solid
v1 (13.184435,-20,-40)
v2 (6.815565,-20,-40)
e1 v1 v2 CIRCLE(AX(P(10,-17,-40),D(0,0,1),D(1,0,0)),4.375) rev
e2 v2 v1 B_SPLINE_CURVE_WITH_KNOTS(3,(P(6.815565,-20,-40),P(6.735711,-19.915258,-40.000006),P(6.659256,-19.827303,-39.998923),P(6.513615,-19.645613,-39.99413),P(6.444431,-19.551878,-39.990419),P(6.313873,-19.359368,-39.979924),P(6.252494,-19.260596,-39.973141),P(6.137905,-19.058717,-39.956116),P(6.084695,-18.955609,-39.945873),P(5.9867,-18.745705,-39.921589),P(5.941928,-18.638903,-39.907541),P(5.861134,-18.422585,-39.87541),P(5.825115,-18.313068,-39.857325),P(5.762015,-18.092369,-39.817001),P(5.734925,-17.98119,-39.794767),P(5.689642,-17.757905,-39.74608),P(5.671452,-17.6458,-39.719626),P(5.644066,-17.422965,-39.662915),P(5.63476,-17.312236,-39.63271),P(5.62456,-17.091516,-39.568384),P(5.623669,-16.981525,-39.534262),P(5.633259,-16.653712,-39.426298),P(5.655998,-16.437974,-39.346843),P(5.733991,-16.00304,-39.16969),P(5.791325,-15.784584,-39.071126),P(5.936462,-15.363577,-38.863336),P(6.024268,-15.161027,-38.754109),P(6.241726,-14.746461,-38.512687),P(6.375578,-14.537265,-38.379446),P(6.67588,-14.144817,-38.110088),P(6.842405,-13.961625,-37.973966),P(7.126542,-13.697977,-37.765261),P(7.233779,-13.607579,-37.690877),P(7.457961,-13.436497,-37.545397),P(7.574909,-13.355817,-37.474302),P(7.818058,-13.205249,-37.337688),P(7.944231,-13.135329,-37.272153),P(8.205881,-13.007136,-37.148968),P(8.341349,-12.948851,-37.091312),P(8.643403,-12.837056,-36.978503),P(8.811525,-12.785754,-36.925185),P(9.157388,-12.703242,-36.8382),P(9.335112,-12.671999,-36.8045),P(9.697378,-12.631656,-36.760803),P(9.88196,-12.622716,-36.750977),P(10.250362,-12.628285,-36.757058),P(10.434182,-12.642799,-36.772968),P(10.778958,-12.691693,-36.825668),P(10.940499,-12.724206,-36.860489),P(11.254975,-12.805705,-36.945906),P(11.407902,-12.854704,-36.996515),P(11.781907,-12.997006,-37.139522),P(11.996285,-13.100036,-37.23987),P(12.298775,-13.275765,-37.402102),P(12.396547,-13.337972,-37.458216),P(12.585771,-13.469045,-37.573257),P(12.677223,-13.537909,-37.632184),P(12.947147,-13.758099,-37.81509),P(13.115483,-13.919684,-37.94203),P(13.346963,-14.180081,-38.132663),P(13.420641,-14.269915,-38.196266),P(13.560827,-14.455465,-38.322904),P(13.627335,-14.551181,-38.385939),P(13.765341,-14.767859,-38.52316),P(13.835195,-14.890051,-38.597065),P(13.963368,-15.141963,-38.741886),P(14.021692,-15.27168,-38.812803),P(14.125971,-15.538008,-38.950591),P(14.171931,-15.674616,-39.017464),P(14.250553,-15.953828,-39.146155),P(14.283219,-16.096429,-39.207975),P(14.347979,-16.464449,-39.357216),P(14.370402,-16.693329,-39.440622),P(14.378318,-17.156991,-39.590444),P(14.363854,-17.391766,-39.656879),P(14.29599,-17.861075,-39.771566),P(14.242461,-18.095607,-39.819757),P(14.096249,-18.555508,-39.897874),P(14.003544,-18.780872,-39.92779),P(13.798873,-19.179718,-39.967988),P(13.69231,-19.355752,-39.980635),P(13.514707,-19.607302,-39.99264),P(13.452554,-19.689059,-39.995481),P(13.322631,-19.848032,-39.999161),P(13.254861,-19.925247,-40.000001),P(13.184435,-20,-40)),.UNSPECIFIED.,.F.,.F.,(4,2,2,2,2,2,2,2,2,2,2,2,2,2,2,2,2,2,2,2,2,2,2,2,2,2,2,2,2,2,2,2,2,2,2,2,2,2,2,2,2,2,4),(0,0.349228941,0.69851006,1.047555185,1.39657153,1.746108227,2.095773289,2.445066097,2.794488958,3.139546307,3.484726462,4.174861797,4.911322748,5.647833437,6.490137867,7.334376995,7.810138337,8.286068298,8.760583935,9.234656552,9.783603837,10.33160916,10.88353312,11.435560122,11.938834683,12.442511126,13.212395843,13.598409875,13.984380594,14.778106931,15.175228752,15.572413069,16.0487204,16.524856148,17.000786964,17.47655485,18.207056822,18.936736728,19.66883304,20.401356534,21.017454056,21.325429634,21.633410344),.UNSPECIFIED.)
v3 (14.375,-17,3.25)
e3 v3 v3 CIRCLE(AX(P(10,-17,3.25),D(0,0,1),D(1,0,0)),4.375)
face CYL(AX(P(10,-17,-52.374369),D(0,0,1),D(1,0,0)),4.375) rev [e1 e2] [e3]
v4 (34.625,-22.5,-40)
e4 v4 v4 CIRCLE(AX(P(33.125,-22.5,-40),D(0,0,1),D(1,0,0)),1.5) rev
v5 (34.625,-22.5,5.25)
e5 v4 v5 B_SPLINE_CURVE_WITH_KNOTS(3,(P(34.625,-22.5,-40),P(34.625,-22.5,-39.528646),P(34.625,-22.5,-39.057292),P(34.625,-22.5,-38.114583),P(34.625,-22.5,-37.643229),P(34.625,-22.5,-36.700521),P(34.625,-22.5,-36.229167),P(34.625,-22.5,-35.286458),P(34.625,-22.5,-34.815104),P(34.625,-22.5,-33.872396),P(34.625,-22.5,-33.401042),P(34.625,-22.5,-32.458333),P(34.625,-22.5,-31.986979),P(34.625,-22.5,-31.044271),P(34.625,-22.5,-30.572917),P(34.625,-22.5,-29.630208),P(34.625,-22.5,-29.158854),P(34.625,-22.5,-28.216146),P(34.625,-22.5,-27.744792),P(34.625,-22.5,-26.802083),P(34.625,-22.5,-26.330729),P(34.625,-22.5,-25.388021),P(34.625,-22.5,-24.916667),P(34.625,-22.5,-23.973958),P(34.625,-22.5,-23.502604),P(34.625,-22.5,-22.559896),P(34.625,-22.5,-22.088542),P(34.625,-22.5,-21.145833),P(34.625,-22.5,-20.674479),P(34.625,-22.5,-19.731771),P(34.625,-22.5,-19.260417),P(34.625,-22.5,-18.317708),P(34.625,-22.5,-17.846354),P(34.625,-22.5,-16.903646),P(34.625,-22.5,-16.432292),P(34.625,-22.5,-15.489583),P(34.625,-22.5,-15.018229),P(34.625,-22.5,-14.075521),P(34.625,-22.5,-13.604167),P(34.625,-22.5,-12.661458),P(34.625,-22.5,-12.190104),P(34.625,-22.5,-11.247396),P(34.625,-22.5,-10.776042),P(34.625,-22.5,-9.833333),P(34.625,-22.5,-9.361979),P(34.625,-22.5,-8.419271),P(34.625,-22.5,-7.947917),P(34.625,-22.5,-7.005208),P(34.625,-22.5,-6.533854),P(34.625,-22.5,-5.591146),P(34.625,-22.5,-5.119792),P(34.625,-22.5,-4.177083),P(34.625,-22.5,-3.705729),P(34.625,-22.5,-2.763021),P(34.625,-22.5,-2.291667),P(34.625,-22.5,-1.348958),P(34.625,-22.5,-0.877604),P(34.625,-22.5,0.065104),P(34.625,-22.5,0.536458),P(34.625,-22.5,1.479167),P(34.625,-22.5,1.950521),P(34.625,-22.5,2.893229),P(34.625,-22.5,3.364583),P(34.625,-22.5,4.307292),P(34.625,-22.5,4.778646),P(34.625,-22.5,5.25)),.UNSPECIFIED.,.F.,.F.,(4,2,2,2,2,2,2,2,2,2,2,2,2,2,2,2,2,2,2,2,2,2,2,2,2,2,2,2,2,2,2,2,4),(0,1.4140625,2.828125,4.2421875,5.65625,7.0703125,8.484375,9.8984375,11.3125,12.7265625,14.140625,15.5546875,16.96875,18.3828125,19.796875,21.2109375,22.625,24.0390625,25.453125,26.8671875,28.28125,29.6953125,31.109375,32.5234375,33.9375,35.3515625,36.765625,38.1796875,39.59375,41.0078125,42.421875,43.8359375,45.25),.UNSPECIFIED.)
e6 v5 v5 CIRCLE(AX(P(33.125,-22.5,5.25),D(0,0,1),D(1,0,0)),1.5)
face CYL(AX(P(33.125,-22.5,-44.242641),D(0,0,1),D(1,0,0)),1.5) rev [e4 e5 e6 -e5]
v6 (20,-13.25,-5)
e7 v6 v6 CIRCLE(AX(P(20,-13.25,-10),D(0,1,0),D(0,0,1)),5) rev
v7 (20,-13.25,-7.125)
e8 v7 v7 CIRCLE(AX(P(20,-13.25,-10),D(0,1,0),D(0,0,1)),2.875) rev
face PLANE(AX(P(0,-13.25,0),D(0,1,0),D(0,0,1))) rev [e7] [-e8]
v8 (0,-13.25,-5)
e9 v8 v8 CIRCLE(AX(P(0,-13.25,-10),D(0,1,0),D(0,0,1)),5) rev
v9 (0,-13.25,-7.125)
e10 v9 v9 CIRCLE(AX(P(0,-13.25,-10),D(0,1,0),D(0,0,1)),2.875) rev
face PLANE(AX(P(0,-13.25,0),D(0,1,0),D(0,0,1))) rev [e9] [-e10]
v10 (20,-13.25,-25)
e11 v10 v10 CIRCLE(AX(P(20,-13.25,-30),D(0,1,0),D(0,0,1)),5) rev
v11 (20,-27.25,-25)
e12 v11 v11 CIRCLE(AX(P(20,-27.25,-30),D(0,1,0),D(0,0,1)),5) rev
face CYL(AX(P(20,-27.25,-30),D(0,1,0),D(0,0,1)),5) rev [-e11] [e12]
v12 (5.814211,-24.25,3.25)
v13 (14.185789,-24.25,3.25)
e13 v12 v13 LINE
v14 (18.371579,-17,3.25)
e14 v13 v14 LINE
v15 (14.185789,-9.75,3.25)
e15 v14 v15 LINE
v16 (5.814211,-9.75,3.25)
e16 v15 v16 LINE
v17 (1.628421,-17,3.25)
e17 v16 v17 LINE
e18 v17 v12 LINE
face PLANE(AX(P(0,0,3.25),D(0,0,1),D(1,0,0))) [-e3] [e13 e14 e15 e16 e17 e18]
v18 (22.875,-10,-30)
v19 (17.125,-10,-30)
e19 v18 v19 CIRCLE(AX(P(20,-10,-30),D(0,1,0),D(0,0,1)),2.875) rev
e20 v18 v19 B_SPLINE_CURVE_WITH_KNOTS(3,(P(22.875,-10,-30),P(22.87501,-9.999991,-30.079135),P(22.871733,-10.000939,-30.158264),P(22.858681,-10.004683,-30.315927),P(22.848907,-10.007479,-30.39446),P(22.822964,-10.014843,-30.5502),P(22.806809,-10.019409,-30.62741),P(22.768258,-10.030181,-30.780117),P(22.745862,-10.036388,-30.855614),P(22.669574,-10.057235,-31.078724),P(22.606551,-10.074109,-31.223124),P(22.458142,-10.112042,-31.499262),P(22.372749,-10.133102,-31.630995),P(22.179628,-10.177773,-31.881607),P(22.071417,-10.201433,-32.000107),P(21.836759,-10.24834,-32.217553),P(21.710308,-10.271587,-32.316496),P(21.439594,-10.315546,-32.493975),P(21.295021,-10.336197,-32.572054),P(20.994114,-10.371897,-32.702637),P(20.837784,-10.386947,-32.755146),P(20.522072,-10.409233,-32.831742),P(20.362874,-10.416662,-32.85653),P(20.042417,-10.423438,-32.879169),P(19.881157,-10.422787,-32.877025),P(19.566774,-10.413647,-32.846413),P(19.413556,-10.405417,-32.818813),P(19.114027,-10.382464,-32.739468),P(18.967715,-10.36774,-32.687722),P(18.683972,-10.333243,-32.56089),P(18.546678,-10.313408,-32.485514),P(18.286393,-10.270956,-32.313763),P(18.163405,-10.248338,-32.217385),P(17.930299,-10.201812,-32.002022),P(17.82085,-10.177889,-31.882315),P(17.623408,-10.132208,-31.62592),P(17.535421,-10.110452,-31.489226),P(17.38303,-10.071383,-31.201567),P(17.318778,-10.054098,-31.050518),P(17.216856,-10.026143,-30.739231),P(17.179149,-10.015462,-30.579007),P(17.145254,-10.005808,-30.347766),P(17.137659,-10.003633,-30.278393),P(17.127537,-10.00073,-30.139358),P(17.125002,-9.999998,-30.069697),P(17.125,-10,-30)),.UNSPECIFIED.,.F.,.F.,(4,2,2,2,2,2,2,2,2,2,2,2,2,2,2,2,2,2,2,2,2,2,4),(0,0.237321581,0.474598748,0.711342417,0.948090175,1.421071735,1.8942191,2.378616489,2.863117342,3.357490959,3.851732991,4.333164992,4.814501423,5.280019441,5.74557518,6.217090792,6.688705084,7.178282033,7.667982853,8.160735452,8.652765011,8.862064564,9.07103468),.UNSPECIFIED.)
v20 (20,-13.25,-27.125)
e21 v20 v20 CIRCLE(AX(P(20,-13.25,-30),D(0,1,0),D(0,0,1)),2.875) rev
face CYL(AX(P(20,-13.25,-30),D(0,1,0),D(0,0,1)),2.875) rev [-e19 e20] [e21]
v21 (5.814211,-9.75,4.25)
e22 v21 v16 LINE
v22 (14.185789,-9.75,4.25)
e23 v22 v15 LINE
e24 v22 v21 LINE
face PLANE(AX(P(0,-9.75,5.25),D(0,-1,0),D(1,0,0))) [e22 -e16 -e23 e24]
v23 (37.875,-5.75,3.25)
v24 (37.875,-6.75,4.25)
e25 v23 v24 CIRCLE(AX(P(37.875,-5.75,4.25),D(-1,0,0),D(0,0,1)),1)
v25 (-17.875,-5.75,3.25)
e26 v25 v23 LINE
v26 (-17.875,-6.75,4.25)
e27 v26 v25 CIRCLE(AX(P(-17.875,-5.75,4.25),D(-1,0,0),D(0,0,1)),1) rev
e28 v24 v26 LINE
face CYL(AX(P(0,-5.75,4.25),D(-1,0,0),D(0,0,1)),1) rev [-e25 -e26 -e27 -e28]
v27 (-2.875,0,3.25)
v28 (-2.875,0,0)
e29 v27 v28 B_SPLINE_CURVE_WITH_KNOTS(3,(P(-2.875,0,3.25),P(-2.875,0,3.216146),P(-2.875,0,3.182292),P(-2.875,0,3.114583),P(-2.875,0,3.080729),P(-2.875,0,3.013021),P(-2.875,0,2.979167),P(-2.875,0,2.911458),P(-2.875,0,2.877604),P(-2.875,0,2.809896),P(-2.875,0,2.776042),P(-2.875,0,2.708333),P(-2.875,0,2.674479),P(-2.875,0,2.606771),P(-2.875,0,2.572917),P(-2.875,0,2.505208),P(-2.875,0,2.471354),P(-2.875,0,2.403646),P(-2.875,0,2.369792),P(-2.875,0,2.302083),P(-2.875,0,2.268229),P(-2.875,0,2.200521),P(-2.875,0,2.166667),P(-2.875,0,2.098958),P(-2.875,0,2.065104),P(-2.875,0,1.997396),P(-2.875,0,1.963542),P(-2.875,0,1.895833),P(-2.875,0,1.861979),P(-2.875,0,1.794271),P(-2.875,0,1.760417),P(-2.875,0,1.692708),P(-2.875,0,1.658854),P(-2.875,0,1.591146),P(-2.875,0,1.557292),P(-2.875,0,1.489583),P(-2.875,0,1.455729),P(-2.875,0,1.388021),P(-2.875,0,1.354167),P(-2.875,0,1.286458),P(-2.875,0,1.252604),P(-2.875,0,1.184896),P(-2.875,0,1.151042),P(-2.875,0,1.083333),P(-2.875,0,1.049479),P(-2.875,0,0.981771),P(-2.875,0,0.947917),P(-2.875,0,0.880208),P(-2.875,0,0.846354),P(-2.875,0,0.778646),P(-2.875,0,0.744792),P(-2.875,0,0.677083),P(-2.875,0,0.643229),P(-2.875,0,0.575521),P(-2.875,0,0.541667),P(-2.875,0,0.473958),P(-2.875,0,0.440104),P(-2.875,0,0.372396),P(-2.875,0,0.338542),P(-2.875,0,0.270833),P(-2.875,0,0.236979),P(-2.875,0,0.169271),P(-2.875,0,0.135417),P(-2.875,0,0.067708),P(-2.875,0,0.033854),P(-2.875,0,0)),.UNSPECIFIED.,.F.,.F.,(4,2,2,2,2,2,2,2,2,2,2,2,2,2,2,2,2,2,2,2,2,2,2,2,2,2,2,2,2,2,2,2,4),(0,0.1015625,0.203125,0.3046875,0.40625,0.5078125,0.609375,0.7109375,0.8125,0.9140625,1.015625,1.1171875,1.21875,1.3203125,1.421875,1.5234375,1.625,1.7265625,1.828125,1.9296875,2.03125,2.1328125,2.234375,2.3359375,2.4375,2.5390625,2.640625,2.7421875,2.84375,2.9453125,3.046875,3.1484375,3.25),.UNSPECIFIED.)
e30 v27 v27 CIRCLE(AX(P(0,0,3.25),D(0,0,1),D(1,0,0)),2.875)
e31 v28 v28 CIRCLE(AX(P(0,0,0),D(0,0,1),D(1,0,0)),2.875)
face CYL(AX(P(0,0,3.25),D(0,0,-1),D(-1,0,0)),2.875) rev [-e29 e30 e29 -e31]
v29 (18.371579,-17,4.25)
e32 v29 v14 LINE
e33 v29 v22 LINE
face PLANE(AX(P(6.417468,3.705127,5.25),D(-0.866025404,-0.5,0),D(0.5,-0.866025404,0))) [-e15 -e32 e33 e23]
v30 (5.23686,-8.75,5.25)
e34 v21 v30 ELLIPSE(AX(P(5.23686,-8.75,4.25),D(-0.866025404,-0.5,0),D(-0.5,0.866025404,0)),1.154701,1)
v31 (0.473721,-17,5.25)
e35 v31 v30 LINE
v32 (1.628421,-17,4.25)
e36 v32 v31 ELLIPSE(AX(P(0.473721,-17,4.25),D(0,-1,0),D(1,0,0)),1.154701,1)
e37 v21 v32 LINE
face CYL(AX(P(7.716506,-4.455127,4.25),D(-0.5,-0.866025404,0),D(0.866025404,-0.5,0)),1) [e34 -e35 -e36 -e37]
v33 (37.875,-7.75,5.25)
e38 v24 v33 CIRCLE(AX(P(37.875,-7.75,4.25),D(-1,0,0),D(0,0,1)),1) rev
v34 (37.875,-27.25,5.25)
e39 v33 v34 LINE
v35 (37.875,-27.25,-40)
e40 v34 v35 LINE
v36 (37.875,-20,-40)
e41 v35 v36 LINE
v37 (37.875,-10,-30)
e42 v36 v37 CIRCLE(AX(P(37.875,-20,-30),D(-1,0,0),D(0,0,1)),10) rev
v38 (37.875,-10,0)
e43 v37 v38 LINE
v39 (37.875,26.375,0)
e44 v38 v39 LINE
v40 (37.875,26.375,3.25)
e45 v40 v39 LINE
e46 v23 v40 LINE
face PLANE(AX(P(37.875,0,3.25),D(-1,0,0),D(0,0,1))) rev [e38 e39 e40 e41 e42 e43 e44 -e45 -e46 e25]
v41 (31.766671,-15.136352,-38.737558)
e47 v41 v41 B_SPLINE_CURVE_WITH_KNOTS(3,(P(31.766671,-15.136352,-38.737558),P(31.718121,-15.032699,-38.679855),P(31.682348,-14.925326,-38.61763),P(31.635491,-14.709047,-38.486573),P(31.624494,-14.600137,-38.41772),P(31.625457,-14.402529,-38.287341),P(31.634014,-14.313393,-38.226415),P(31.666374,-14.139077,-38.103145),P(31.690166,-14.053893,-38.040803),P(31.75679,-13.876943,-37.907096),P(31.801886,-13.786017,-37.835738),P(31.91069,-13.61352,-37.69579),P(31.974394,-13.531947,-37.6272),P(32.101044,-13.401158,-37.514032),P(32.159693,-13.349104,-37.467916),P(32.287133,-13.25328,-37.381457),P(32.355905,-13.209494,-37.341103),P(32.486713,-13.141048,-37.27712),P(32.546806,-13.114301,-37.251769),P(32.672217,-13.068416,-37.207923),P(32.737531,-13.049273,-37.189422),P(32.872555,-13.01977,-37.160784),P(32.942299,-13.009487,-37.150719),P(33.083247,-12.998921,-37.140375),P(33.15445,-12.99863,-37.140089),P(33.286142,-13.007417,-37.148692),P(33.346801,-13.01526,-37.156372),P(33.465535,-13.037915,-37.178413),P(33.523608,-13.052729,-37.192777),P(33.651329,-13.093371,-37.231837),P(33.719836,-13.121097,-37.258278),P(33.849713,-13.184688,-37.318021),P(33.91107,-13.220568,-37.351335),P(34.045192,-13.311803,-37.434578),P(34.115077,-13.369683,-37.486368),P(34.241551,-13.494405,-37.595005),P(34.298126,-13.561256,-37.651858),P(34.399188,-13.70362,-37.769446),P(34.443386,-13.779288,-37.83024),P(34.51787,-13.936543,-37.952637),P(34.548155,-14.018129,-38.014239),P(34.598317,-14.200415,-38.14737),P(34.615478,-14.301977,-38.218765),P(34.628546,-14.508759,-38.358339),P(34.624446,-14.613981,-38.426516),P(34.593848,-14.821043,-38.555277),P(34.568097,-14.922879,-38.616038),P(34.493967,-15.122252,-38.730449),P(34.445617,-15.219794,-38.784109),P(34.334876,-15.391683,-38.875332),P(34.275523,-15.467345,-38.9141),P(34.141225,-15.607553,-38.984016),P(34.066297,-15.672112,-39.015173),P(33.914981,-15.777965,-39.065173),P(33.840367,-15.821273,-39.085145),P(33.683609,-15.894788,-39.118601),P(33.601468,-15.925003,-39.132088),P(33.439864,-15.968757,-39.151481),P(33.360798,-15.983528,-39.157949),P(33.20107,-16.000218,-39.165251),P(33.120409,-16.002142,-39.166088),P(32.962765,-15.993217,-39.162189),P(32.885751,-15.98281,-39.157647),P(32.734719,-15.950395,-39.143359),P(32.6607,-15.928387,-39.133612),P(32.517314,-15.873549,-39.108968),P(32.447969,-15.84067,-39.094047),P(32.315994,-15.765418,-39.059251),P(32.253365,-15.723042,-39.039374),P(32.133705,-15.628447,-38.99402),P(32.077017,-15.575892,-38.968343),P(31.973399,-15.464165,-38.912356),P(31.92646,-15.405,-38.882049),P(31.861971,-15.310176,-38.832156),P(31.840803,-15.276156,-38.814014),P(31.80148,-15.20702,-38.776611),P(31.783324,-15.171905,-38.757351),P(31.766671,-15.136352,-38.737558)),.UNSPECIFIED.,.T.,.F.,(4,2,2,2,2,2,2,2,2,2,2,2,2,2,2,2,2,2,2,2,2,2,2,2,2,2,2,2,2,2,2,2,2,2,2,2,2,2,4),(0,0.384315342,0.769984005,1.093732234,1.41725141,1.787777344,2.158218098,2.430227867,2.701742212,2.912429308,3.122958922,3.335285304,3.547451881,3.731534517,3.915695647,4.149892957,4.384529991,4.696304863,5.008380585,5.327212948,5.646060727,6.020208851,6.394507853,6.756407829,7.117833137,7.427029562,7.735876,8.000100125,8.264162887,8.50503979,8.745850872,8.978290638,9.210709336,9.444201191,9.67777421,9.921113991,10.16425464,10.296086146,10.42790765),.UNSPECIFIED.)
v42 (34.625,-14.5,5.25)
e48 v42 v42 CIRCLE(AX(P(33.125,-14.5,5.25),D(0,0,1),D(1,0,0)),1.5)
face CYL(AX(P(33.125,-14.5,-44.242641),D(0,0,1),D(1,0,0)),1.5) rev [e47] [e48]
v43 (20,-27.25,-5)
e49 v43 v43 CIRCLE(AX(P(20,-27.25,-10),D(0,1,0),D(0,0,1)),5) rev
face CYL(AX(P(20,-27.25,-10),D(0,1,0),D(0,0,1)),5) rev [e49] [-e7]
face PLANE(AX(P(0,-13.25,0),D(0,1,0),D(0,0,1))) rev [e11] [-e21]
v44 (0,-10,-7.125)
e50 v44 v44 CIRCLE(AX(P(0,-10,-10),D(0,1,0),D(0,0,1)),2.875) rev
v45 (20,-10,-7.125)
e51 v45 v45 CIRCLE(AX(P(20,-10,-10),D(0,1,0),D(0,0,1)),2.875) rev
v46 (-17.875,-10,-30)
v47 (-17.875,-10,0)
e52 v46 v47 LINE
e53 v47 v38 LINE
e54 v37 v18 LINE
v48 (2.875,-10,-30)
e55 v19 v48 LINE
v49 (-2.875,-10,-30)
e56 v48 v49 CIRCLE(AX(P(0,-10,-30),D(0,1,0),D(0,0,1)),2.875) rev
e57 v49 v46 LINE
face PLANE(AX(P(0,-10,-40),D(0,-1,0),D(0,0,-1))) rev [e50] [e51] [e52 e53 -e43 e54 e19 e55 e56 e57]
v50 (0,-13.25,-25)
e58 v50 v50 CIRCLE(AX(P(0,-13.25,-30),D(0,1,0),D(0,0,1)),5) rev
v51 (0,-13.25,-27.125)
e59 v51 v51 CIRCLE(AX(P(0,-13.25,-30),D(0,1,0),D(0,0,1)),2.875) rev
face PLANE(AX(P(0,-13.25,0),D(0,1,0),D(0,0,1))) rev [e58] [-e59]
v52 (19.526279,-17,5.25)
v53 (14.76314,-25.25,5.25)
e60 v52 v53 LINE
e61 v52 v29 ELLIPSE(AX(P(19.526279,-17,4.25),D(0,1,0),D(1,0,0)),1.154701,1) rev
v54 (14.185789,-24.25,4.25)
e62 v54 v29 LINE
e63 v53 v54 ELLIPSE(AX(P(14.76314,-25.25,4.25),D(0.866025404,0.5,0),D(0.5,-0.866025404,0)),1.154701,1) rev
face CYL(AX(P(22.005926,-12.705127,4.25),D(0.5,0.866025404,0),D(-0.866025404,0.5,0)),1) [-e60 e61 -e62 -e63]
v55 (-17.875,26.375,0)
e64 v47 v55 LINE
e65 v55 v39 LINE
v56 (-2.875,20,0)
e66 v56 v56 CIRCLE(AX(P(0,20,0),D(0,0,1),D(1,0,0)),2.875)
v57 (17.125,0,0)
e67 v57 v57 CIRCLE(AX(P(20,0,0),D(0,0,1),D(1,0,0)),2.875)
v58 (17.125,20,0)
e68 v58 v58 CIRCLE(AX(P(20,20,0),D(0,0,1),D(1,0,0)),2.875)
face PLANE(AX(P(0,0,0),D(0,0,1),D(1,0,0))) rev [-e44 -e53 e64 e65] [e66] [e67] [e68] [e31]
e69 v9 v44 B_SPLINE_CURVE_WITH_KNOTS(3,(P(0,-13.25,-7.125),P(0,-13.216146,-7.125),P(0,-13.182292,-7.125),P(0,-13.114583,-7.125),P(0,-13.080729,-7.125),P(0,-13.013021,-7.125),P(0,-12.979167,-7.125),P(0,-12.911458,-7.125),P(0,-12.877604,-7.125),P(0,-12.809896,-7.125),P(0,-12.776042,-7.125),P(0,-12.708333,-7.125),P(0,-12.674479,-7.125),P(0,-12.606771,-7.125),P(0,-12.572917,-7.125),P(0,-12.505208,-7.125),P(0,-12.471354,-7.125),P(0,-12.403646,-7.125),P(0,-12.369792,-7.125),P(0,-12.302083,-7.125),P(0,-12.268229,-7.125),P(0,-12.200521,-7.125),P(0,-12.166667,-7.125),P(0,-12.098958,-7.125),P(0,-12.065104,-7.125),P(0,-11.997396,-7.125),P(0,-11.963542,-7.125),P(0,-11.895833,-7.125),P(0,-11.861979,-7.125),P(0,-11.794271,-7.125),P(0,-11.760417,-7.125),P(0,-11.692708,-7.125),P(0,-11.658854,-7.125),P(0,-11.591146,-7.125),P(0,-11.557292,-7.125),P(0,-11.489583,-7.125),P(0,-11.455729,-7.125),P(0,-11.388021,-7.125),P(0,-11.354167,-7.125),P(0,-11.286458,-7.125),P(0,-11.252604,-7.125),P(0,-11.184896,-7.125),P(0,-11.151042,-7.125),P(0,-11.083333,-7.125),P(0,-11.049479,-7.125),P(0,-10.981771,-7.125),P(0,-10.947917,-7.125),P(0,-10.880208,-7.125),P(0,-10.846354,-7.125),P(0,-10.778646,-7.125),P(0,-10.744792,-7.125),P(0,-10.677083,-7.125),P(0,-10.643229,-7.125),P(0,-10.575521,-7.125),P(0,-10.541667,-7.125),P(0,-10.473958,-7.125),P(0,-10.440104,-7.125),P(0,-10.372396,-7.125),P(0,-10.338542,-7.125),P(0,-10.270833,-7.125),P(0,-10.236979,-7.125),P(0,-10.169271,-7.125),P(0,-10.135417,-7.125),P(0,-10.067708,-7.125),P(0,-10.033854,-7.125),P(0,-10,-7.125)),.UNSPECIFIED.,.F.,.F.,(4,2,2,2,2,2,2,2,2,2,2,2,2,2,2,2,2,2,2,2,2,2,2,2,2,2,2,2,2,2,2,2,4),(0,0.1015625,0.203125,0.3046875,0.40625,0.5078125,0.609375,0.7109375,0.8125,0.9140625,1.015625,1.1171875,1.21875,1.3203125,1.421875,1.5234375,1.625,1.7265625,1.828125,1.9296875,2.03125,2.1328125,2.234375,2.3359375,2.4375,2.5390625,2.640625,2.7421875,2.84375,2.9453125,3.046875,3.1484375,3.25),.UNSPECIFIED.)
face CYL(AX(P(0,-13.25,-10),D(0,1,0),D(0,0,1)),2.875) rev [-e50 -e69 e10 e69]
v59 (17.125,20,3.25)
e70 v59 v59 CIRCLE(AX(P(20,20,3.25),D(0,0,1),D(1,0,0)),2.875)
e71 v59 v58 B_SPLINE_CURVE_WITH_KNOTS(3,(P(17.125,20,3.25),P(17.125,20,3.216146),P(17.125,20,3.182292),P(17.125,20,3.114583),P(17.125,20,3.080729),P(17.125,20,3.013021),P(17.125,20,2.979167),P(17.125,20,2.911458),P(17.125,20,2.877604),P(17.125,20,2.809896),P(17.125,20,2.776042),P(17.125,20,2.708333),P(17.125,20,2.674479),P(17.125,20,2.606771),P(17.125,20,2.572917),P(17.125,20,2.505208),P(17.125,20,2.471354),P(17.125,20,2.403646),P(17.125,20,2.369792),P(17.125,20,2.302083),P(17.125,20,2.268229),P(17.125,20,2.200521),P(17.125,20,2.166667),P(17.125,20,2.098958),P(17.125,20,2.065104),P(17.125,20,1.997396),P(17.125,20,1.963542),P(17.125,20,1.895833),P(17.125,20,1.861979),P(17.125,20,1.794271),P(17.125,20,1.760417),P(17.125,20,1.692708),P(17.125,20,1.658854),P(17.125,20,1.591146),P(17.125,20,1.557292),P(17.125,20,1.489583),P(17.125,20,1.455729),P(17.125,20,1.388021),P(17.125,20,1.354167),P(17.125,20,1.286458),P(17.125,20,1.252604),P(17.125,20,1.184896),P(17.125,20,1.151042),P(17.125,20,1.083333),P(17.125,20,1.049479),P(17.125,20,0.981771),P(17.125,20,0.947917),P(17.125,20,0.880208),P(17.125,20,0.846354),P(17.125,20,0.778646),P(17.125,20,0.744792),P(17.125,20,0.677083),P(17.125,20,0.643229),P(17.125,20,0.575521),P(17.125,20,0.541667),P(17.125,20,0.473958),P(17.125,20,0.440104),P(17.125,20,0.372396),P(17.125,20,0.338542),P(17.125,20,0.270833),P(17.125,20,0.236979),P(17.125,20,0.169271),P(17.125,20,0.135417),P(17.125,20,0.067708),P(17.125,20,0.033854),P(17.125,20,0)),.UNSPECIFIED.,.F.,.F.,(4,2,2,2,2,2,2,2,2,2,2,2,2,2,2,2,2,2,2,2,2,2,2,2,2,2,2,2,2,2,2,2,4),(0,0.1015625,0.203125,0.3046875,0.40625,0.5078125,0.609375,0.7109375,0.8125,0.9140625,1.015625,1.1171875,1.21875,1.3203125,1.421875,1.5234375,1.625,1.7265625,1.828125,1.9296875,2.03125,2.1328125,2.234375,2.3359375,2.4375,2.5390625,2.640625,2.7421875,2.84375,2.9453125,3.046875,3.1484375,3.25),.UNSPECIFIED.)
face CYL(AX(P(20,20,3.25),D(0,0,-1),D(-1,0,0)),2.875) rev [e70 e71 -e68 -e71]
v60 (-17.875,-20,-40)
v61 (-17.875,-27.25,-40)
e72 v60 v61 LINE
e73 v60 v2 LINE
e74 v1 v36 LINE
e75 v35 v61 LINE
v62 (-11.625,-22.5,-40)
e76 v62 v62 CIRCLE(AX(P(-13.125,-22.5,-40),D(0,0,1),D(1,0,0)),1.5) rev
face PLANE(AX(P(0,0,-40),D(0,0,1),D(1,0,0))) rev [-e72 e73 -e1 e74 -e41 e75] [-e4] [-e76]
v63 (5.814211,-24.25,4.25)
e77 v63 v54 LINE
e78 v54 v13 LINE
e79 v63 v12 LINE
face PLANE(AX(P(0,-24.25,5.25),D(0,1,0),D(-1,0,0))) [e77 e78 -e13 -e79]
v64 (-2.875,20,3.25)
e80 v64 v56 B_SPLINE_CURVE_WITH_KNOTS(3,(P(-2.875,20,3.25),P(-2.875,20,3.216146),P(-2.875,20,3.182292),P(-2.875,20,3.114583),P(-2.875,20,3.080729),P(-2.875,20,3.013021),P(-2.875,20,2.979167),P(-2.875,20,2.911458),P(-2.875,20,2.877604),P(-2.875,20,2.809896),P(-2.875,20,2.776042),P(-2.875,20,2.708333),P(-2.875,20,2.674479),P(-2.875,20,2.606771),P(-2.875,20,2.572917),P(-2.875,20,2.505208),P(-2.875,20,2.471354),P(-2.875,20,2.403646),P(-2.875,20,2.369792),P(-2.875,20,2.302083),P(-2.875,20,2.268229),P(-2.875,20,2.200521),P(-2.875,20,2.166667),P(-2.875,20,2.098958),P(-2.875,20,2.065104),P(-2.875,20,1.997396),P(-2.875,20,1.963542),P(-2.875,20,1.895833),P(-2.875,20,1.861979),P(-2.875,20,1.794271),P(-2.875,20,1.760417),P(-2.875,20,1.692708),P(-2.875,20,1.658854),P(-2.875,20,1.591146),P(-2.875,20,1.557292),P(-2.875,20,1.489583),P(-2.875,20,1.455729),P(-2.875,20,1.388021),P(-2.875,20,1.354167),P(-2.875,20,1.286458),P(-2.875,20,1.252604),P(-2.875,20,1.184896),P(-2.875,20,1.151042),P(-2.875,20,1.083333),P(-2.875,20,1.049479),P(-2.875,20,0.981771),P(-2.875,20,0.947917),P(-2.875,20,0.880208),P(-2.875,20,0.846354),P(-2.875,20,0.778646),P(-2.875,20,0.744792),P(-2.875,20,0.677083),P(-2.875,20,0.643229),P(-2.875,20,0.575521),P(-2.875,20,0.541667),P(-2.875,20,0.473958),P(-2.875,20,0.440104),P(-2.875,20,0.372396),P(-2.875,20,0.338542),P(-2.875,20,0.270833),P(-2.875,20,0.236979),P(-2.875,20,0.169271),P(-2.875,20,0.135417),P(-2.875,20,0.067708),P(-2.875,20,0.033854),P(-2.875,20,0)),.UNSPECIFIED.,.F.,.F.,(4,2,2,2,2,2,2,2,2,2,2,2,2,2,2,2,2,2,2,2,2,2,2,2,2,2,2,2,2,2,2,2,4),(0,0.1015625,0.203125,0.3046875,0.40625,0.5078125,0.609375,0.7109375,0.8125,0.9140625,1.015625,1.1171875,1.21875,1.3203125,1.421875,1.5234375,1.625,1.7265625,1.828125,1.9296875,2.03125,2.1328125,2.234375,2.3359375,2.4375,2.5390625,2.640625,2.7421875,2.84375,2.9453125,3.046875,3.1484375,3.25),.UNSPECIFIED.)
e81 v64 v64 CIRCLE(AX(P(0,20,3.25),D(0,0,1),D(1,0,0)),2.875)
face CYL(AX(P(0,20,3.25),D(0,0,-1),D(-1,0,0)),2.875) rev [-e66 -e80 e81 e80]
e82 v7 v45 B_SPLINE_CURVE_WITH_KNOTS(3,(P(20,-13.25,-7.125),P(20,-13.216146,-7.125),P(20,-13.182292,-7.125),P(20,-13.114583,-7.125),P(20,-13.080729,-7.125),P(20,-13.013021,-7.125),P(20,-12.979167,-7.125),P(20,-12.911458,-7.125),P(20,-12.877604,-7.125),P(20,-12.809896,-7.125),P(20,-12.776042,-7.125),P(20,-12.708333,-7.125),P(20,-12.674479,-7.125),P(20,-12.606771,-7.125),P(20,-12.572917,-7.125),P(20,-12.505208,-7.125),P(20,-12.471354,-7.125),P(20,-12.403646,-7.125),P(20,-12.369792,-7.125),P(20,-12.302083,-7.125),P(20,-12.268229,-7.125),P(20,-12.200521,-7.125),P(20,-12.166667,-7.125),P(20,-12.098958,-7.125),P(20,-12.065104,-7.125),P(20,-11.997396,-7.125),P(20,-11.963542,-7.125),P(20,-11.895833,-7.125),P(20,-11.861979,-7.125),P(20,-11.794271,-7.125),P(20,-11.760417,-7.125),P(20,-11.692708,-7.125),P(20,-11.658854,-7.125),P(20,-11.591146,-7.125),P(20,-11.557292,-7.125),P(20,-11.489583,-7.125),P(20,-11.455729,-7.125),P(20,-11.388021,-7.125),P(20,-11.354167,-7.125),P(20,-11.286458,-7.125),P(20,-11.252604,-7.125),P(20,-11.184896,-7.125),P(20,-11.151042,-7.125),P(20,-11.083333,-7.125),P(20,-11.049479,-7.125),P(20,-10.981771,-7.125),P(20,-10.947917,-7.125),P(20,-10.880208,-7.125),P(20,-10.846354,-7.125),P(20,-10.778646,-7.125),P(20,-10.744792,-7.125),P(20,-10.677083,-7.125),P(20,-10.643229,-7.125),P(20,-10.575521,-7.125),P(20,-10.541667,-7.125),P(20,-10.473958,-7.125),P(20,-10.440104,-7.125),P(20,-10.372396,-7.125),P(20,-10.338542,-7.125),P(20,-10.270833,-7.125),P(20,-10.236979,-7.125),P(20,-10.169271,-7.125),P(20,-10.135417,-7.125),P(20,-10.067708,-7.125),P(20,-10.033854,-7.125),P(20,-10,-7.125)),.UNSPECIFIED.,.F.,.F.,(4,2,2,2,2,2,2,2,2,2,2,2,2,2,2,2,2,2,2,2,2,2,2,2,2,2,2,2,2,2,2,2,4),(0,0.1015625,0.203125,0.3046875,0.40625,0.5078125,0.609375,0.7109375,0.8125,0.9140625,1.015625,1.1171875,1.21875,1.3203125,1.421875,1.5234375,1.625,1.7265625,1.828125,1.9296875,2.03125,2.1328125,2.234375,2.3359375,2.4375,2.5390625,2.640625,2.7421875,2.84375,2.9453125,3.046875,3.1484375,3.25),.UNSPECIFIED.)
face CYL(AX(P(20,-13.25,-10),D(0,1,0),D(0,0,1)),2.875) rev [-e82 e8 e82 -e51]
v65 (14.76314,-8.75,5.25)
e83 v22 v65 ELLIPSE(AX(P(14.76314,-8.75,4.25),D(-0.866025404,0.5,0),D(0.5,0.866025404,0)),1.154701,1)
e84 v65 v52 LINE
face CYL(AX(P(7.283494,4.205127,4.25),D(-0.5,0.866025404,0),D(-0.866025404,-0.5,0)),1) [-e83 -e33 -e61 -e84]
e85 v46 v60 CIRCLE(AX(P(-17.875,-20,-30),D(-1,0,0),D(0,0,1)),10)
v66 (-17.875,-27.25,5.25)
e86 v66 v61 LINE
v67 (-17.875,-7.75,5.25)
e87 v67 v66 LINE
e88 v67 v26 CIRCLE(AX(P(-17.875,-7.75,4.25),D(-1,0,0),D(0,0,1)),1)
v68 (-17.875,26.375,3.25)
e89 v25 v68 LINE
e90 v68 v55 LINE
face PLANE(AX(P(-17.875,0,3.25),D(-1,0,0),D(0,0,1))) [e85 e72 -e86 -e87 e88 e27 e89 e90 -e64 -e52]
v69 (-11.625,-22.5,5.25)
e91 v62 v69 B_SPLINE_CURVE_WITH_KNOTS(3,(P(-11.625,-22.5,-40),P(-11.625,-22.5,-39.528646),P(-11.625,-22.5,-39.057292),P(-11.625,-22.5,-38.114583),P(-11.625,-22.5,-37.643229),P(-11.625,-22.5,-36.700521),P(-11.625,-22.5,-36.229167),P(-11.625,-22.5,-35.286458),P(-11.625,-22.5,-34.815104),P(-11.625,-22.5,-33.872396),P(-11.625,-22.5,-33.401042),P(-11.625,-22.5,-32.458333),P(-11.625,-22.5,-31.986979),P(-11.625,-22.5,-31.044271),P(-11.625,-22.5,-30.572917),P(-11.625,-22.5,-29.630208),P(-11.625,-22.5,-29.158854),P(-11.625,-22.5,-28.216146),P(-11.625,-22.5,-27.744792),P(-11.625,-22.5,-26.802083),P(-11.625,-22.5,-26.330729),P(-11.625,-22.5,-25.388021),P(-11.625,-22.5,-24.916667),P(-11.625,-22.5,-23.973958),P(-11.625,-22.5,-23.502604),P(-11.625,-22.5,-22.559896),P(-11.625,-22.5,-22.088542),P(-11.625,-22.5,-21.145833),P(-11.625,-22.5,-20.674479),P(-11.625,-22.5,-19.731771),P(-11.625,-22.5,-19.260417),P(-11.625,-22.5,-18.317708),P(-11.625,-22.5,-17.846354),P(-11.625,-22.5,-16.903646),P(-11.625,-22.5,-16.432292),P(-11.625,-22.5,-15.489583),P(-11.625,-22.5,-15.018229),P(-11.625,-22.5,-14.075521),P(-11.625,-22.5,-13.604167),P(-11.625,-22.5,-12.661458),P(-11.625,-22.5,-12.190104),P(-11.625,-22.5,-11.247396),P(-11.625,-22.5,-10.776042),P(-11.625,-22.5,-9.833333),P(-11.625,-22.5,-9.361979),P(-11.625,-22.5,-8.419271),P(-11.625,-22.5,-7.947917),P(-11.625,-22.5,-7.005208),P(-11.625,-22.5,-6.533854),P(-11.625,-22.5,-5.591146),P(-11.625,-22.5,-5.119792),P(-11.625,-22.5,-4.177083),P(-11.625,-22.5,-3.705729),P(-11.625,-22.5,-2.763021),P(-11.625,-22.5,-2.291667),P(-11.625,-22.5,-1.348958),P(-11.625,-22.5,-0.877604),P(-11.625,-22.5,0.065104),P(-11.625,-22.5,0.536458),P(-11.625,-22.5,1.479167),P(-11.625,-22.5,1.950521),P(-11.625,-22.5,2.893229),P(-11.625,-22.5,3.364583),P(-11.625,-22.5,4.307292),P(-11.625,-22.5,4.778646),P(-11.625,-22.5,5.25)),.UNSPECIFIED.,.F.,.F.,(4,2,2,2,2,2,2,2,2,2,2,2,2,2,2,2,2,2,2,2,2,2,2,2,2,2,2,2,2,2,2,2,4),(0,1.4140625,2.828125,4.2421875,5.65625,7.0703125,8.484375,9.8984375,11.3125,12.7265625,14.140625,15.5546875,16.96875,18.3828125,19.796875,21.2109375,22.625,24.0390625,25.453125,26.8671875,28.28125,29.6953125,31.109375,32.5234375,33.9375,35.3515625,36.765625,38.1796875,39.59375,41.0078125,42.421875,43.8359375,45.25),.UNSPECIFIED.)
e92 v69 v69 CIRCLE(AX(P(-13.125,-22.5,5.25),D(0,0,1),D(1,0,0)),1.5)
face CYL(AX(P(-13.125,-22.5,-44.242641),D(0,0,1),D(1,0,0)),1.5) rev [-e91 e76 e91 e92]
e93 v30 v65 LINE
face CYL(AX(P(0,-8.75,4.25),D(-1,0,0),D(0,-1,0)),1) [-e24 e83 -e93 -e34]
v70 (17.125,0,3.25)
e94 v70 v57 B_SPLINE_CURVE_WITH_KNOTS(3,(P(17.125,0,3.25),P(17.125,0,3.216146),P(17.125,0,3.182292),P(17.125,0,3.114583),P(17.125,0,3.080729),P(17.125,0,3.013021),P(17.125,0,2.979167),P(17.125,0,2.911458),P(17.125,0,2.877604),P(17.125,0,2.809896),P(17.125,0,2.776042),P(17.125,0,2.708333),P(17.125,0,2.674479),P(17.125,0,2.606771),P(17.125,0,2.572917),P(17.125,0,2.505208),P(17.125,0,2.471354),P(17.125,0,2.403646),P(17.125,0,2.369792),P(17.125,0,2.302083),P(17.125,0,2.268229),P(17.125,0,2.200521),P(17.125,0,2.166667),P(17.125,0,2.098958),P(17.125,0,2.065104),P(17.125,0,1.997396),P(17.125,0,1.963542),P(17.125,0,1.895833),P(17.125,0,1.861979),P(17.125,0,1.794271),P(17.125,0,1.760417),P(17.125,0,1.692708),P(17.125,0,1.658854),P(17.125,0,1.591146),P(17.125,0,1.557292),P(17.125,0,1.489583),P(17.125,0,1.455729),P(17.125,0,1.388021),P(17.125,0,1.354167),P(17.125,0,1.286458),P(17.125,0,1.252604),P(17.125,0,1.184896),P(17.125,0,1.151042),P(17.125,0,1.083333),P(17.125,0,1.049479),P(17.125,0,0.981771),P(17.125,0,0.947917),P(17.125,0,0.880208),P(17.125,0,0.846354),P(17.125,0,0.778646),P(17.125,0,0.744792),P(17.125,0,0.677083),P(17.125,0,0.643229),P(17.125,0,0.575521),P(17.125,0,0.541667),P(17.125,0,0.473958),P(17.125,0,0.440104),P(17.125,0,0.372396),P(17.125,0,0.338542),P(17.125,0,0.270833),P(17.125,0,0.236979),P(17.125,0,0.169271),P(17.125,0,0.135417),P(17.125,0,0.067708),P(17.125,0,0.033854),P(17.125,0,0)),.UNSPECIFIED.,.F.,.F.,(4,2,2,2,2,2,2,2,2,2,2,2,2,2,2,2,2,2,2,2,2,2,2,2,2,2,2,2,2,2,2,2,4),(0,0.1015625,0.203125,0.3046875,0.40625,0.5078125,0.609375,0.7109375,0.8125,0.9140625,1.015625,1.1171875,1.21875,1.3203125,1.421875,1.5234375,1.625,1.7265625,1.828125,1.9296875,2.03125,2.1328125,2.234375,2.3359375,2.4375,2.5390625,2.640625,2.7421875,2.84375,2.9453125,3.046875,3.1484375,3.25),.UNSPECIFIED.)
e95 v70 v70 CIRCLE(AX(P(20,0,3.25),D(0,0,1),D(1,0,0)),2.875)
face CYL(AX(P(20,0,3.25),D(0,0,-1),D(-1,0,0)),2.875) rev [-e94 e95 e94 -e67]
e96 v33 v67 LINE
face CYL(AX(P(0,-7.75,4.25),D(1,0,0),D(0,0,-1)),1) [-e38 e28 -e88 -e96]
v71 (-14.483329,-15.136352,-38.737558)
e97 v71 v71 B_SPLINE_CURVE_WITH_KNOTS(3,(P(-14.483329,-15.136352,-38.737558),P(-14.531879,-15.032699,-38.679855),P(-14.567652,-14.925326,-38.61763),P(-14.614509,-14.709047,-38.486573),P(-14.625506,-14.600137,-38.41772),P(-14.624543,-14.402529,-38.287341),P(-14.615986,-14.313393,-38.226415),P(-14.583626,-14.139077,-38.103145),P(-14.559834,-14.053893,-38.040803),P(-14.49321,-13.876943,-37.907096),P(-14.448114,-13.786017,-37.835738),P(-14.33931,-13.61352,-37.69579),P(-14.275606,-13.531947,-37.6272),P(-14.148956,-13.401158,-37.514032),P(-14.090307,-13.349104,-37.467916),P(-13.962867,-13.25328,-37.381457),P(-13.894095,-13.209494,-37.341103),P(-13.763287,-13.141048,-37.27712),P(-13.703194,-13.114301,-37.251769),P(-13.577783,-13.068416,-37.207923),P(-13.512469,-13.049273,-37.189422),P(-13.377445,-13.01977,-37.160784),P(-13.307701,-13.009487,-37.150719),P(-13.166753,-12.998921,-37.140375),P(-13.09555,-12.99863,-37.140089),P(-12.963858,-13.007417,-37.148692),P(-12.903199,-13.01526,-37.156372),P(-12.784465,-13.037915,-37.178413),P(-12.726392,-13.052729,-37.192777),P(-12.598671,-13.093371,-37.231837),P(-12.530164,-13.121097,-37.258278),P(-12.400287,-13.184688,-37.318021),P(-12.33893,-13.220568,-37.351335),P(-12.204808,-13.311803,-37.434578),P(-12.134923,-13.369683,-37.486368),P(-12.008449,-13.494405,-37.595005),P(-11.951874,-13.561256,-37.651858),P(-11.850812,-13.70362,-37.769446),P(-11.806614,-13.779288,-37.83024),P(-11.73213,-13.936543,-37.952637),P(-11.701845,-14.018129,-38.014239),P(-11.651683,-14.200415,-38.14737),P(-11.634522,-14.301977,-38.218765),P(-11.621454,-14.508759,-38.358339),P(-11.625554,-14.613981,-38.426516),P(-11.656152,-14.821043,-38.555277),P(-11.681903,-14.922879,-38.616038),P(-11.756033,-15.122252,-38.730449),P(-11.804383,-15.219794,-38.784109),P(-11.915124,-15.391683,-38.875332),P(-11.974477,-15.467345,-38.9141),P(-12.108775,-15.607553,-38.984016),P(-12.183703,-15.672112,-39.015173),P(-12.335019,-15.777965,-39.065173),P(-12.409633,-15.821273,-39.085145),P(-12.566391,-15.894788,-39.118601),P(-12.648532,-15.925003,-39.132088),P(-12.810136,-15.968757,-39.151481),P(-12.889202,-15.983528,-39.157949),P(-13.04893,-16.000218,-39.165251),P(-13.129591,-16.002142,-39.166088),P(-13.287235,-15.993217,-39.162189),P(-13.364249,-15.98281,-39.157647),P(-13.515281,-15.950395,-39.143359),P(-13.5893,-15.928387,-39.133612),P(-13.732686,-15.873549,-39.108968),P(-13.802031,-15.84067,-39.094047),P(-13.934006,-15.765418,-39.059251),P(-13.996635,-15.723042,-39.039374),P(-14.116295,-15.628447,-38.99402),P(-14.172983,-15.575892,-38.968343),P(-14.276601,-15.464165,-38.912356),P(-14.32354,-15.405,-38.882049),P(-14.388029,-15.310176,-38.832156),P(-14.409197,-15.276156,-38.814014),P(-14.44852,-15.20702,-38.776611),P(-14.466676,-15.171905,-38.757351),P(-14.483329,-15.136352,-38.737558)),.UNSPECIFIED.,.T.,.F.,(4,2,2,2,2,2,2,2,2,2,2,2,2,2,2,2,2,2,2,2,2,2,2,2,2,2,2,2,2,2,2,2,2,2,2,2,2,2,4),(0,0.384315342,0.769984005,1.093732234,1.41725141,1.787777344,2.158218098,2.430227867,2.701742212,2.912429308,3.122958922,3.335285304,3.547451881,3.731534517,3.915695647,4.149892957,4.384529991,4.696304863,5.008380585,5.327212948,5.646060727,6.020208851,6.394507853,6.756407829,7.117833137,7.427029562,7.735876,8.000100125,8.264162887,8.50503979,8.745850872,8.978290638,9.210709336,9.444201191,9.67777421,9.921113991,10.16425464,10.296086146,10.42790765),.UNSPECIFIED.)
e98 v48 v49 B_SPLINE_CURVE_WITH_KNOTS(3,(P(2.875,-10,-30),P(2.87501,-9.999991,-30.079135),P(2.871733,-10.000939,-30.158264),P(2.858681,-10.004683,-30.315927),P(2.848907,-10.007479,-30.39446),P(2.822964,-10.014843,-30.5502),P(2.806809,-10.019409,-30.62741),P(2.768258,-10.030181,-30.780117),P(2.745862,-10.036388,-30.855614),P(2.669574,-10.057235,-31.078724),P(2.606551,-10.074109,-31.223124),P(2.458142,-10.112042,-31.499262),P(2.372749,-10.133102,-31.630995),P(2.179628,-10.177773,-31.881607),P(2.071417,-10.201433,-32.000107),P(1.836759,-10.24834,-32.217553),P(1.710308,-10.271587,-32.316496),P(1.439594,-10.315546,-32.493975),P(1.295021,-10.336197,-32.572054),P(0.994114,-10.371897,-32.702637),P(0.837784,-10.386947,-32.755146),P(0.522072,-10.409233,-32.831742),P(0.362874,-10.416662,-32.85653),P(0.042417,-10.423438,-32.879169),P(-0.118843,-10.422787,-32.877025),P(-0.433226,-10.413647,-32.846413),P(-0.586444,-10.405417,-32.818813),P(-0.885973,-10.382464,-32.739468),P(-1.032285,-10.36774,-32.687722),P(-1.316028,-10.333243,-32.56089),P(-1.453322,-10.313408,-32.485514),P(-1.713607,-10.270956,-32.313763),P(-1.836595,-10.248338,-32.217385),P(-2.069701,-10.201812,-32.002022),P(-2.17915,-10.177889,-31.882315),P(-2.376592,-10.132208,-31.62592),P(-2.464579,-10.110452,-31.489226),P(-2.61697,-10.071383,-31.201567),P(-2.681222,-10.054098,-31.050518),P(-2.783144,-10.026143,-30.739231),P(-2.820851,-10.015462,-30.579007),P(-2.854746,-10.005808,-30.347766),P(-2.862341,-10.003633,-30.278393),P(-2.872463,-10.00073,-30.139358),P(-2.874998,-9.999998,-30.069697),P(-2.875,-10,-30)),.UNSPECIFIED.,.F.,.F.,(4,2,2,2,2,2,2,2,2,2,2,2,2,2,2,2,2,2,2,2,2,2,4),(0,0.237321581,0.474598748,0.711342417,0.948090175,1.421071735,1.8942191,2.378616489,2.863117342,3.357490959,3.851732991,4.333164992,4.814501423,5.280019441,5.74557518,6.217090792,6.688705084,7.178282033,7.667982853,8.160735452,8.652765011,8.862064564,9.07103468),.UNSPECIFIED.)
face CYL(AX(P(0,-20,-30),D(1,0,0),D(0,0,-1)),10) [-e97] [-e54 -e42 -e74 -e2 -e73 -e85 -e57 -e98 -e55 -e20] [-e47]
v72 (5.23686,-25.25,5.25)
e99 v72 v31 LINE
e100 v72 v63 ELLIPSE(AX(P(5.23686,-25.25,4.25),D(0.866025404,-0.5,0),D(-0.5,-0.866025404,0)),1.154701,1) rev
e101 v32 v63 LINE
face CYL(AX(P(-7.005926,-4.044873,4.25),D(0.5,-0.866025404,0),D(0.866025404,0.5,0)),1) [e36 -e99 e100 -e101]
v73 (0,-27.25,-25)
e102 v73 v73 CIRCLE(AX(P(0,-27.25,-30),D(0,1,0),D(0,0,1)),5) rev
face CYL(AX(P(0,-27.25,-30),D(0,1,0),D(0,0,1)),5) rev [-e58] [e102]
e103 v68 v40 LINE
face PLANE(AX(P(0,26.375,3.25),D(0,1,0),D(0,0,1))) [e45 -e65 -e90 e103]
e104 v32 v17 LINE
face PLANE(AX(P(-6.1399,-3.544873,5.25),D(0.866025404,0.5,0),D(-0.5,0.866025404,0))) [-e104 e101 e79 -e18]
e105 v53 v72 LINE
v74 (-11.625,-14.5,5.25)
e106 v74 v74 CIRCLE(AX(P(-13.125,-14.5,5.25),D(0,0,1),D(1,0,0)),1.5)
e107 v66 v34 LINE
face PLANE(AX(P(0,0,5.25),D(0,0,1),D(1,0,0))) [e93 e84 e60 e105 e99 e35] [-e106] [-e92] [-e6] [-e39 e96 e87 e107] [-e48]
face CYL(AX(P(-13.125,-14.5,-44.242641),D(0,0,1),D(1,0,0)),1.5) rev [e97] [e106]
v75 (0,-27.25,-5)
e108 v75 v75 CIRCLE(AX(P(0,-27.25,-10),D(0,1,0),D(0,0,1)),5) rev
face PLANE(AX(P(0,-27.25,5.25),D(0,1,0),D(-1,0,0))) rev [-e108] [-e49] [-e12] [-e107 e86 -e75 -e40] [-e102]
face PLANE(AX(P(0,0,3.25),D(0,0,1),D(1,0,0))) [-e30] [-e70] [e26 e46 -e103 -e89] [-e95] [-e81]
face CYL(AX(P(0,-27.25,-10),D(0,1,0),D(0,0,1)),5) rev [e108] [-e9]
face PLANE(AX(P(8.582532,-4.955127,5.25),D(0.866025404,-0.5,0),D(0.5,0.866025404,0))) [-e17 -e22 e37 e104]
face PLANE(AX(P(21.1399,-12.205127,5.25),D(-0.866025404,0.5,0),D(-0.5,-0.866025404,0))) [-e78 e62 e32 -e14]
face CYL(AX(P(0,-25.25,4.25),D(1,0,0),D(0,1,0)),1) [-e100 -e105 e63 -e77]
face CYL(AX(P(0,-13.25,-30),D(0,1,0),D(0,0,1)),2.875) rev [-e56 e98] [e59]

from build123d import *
from build123d.topology import SkipClean

# Parameters (mm, degrees)
SKETCH1_R           = 2.875
SKETCH1_W           = 55.75
SKETCH1_H           = 3.25
BOSS_EXTRUDE1_DEPTH = 3.25
SKETCH1_4_W         = 55.75
SKETCH1_4_H         = 3.25
BOSS_EXTRUDE2_DEPTH = 40
CUT_EXTRUDE2_DEPTH  = 43.25
BOSS_EXTRUDE4_DEPTH = 2
BOSS_EXTRUDE5_DEPTH = 43.25
SKETCH2_R           = 5
SKETCH2_R_2         = 2.875
CUT_EXTRUDE1_DEPTH  = 17.25
FILLET1_R           = 1
SKETCH2_3_R         = 5
SKETCH2_3_R_2       = 2.875
BOSS_EXTRUDE6_DEPTH = 3.25
SKETCH4_R           = 1.5
CUT_EXTRUDE4_DEPTH  = 45.25
FILLET4_R           = 1
FILLET5_R           = 10


# Some blends are built 0.0001 mm under size
with BuildPart() as part:
    # Sketch1 → Boss-Extrude1 (new body)
    # profile 1 of 2: a face of its own
    with BuildSketch(Plane.XY):
        Polygon((-17.875, -10), (37.875, -10), (37.875, -6.375), (37.875, 26.375), (-17.875, 26.375), (-17.875, -6.375), align=None)
        with Locations(Location((20, 20, 0), (0, 0, 180))):
            Circle(SKETCH1_R, mode=Mode.SUBTRACT)
        with Locations(Location((20, 0, 0), (0, 0, 180))):
            Circle(SKETCH1_R, mode=Mode.SUBTRACT)
        with Locations(Location((0, 0, 0), (0, 0, 180))):
            Circle(SKETCH1_R, mode=Mode.SUBTRACT)
        with Locations(Location((0, 20, 0), (0, 0, 180))):
            Circle(SKETCH1_R, mode=Mode.SUBTRACT)
    # profile 2 of 2: a face of its own
    with BuildSketch(Plane.XY):
        with Locations((10, -11.625)):
            Rectangle(SKETCH1_W, SKETCH1_H)
    extrude(amount=BOSS_EXTRUDE1_DEPTH)

    # Sketch1<4> → Boss-Extrude2 (add)
    with BuildSketch(Plane.XY):
        with Locations((10, -11.625)):
            Rectangle(SKETCH1_4_W, SKETCH1_4_H)
    extrude(amount=-BOSS_EXTRUDE2_DEPTH)

    # Sketch3 → Cut-Extrude2 (cut)
    with BuildSketch(Plane.XY.offset(3.25)):
        with BuildLine():
            Line((12.253469547, -13.25), (7.746530453, -13.25))
            ThreePointArc((7.746530453, -13.25), (7.84573728, -20.807857289), (14.375, -17))
            ThreePointArc((14.375, -17), (13.807857289, -14.84573728), (12.253469547, -13.25))
        make_face()
        with BuildLine():
            ThreePointArc((12.253469547, -13.25), (10, -12.625), (7.746530453, -13.25))
            Line((7.746530453, -13.25), (12.253469547, -13.25))
        make_face()
    extrude(amount=-CUT_EXTRUDE2_DEPTH, mode=Mode.SUBTRACT)

    # Sketch3<4> → Boss-Extrude4 (add)
    with BuildSketch(Plane.XY.offset(3.25)):
        Polygon((3.793484606, -13.25), (-17.875, -13.25), (-17.875, -27.25), (37.875, -27.25), (37.875, -13.25), (16.206515394, -13.25), (18.371578903, -17), (14.185789452, -24.25), (5.814210548, -24.25), (1.628421097, -17), align=None)
        Polygon((37.875, -6.75), (-17.875, -6.75), (-17.875, -13.25), (3.793484606, -13.25), (5.814210548, -9.75), (14.185789452, -9.75), (16.206515394, -13.25), (37.875, -13.25), align=None)
    extrude(amount=BOSS_EXTRUDE4_DEPTH)

    # Sketch3<5> → Boss-Extrude5 (add)
    with SkipClean():  # the faces are left unmerged after this step: merging them gives an invalid solid
        with BuildSketch(Plane.XY.offset(3.25)):
            Polygon((3.793484606, -13.25), (-17.875, -13.25), (-17.875, -27.25), (37.875, -27.25), (37.875, -13.25), (16.206515394, -13.25), (18.371578903, -17), (14.185789452, -24.25), (5.814210548, -24.25), (1.628421097, -17), align=None)
            with BuildLine():
                Line((7.746530453, -13.25), (3.793484606, -13.25))
                Line((3.793484606, -13.25), (1.628421097, -17))
                Line((1.628421097, -17), (5.814210548, -24.25))
                Line((5.814210548, -24.25), (14.185789452, -24.25))
                Line((14.185789452, -24.25), (18.371578903, -17))
                Line((18.371578903, -17), (16.206515394, -13.25))
                Line((16.206515394, -13.25), (12.253469547, -13.25))
                ThreePointArc((12.253469547, -13.25), (13.807857289, -14.84573728), (14.375, -17))
                ThreePointArc((14.375, -17), (7.84573728, -20.807857289), (7.746530453, -13.25))
            make_face()
        extrude(amount=-BOSS_EXTRUDE5_DEPTH)

    # Sketch2 → Cut-Extrude1 (cut)
    # profile 1 of 8: a face of its own
    with SkipClean():  # the faces are left unmerged after this step: merging them gives an invalid solid
        with BuildSketch(Plane.XZ.offset(10)):
            with Locations(Location((20, -10, 0), (0, 0, 90))):
                Circle(SKETCH2_R)
            with Locations((20, -10)):
                Circle(SKETCH2_R_2, mode=Mode.SUBTRACT)
        # profile 2 of 8: a face of its own
        with BuildSketch(Plane.XZ.offset(10)):
            with Locations((20, -10)):
                Circle(SKETCH2_R_2)
        # profile 3 of 8: a face of its own
        with BuildSketch(Plane.XZ.offset(10)):
            with Locations(Location((0, -10, 0), (0, 0, 90))):
                Circle(SKETCH2_R)
            with Locations((0, -10)):
                Circle(SKETCH2_R_2, mode=Mode.SUBTRACT)
        # profile 4 of 8: a face of its own
        with BuildSketch(Plane.XZ.offset(10)):
            with Locations((0, -10)):
                Circle(SKETCH2_R_2)
        # profile 5 of 8: a face of its own
        with BuildSketch(Plane.XZ.offset(10)):
            with Locations(Location((0, -30, 0), (0, 0, 90))):
                Circle(SKETCH2_R)
            with Locations((0, -30)):
                Circle(SKETCH2_R_2, mode=Mode.SUBTRACT)
        # profile 6 of 8: a face of its own
        with BuildSketch(Plane.XZ.offset(10)):
            with Locations((0, -30)):
                Circle(SKETCH2_R_2)
        # profile 7 of 8: a face of its own
        with BuildSketch(Plane.XZ.offset(10)):
            with Locations(Location((20, -30, 0), (0, 0, 90))):
                Circle(SKETCH2_R)
            with Locations((20, -30)):
                Circle(SKETCH2_R_2, mode=Mode.SUBTRACT)
        # profile 8 of 8: a face of its own
        with BuildSketch(Plane.XZ.offset(10)):
            with Locations((20, -30)):
                Circle(SKETCH2_R_2)
        extrude(amount=CUT_EXTRUDE1_DEPTH, mode=Mode.SUBTRACT)

    # Fillet1
    fillet1_edges = [part.edges().sort_by_distance(p)[0] for p in [
        (10, -6.75, 3.25),
    ]]
    fillet(fillet1_edges, radius=FILLET1_R)
    fillet1_2_edges = [part.edges().sort_by_distance(p)[0] for p in [
        (10, -6.75, 5.25),
    ]]
    fillet(fillet1_2_edges, radius=FILLET1_R - 0.0001)  # a hair under: the kernel refuses the full size

    # Sketch2<3> → Boss-Extrude6 (add)
    # profile 1 of 4: a face of its own
    with BuildSketch(Plane.XZ.offset(10)):
        with Locations(Location((20, -10, 0), (0, 0, 90))):
            Circle(SKETCH2_3_R)
        with Locations(Location((20, -10, 0), (0, 0, 90))):
            Circle(SKETCH2_3_R_2, mode=Mode.SUBTRACT)
    # profile 2 of 4: a face of its own
    with BuildSketch(Plane.XZ.offset(10)):
        with Locations(Location((0, -10, 0), (0, 0, 90))):
            Circle(SKETCH2_3_R)
        with Locations(Location((0, -10, 0), (0, 0, 90))):
            Circle(SKETCH2_3_R_2, mode=Mode.SUBTRACT)
    # profile 3 of 4: a face of its own
    with BuildSketch(Plane.XZ.offset(10)):
        with Locations(Location((0, -30, 0), (0, 0, 90))):
            Circle(SKETCH2_3_R)
        with Locations(Location((0, -30, 0), (0, 0, 90))):
            Circle(SKETCH2_3_R_2, mode=Mode.SUBTRACT)
    # profile 4 of 4: a face of its own
    with BuildSketch(Plane.XZ.offset(10)):
        with Locations(Location((20, -30, 0), (0, 0, 90))):
            Circle(SKETCH2_3_R)
        with Locations(Location((20, -30, 0), (0, 0, 90))):
            Circle(SKETCH2_3_R_2, mode=Mode.SUBTRACT)
    extrude(amount=BOSS_EXTRUDE6_DEPTH)

    # Sketch4 → Cut-Extrude4 (cut)
    with BuildSketch(Plane.XY.offset(5.25)):
        with Locations((33.125, -22.5)):
            Circle(SKETCH4_R)
        with Locations((-13.125, -22.5)):
            Circle(SKETCH4_R)
        with Locations((-13.125, -14.5)):
            Circle(SKETCH4_R)
        with Locations((33.125, -14.5)):
            Circle(SKETCH4_R)
    extrude(amount=-CUT_EXTRUDE4_DEPTH, mode=Mode.SUBTRACT)

    # Fillet4
    fillet4_edges = [part.edges().sort_by_distance(p)[0] for p in [
        (3.721315823, -13.375, 5.25),
        (10, -9.75, 5.25),
        (16.278684177, -13.375, 5.25),
        (16.278684177, -20.625, 5.25),
        (10, -24.25, 5.25),
        (3.721315823, -20.625, 5.25),
    ]]
    fillet(fillet4_edges, radius=FILLET4_R)

    # Fillet5
    # the kernel refuses this fillet: 10 mm, written as the material it takes off along each edge
    with BuildSketch(Plane(origin=(62.875, -10, -40), x_dir=(0, -1, 0), z_dir=(-1, 0, 0))) as fillet5_piece_1:
        with BuildLine():
            CenterArc((FILLET5_R, FILLET5_R), FILLET5_R, 180, 90)
            Line((0, FILLET5_R), (0, 0))
            Line((0, 0), (FILLET5_R, 0))
        make_face()
    extrude(amount=105.75, mode=Mode.SUBTRACT)


solid = part.part
